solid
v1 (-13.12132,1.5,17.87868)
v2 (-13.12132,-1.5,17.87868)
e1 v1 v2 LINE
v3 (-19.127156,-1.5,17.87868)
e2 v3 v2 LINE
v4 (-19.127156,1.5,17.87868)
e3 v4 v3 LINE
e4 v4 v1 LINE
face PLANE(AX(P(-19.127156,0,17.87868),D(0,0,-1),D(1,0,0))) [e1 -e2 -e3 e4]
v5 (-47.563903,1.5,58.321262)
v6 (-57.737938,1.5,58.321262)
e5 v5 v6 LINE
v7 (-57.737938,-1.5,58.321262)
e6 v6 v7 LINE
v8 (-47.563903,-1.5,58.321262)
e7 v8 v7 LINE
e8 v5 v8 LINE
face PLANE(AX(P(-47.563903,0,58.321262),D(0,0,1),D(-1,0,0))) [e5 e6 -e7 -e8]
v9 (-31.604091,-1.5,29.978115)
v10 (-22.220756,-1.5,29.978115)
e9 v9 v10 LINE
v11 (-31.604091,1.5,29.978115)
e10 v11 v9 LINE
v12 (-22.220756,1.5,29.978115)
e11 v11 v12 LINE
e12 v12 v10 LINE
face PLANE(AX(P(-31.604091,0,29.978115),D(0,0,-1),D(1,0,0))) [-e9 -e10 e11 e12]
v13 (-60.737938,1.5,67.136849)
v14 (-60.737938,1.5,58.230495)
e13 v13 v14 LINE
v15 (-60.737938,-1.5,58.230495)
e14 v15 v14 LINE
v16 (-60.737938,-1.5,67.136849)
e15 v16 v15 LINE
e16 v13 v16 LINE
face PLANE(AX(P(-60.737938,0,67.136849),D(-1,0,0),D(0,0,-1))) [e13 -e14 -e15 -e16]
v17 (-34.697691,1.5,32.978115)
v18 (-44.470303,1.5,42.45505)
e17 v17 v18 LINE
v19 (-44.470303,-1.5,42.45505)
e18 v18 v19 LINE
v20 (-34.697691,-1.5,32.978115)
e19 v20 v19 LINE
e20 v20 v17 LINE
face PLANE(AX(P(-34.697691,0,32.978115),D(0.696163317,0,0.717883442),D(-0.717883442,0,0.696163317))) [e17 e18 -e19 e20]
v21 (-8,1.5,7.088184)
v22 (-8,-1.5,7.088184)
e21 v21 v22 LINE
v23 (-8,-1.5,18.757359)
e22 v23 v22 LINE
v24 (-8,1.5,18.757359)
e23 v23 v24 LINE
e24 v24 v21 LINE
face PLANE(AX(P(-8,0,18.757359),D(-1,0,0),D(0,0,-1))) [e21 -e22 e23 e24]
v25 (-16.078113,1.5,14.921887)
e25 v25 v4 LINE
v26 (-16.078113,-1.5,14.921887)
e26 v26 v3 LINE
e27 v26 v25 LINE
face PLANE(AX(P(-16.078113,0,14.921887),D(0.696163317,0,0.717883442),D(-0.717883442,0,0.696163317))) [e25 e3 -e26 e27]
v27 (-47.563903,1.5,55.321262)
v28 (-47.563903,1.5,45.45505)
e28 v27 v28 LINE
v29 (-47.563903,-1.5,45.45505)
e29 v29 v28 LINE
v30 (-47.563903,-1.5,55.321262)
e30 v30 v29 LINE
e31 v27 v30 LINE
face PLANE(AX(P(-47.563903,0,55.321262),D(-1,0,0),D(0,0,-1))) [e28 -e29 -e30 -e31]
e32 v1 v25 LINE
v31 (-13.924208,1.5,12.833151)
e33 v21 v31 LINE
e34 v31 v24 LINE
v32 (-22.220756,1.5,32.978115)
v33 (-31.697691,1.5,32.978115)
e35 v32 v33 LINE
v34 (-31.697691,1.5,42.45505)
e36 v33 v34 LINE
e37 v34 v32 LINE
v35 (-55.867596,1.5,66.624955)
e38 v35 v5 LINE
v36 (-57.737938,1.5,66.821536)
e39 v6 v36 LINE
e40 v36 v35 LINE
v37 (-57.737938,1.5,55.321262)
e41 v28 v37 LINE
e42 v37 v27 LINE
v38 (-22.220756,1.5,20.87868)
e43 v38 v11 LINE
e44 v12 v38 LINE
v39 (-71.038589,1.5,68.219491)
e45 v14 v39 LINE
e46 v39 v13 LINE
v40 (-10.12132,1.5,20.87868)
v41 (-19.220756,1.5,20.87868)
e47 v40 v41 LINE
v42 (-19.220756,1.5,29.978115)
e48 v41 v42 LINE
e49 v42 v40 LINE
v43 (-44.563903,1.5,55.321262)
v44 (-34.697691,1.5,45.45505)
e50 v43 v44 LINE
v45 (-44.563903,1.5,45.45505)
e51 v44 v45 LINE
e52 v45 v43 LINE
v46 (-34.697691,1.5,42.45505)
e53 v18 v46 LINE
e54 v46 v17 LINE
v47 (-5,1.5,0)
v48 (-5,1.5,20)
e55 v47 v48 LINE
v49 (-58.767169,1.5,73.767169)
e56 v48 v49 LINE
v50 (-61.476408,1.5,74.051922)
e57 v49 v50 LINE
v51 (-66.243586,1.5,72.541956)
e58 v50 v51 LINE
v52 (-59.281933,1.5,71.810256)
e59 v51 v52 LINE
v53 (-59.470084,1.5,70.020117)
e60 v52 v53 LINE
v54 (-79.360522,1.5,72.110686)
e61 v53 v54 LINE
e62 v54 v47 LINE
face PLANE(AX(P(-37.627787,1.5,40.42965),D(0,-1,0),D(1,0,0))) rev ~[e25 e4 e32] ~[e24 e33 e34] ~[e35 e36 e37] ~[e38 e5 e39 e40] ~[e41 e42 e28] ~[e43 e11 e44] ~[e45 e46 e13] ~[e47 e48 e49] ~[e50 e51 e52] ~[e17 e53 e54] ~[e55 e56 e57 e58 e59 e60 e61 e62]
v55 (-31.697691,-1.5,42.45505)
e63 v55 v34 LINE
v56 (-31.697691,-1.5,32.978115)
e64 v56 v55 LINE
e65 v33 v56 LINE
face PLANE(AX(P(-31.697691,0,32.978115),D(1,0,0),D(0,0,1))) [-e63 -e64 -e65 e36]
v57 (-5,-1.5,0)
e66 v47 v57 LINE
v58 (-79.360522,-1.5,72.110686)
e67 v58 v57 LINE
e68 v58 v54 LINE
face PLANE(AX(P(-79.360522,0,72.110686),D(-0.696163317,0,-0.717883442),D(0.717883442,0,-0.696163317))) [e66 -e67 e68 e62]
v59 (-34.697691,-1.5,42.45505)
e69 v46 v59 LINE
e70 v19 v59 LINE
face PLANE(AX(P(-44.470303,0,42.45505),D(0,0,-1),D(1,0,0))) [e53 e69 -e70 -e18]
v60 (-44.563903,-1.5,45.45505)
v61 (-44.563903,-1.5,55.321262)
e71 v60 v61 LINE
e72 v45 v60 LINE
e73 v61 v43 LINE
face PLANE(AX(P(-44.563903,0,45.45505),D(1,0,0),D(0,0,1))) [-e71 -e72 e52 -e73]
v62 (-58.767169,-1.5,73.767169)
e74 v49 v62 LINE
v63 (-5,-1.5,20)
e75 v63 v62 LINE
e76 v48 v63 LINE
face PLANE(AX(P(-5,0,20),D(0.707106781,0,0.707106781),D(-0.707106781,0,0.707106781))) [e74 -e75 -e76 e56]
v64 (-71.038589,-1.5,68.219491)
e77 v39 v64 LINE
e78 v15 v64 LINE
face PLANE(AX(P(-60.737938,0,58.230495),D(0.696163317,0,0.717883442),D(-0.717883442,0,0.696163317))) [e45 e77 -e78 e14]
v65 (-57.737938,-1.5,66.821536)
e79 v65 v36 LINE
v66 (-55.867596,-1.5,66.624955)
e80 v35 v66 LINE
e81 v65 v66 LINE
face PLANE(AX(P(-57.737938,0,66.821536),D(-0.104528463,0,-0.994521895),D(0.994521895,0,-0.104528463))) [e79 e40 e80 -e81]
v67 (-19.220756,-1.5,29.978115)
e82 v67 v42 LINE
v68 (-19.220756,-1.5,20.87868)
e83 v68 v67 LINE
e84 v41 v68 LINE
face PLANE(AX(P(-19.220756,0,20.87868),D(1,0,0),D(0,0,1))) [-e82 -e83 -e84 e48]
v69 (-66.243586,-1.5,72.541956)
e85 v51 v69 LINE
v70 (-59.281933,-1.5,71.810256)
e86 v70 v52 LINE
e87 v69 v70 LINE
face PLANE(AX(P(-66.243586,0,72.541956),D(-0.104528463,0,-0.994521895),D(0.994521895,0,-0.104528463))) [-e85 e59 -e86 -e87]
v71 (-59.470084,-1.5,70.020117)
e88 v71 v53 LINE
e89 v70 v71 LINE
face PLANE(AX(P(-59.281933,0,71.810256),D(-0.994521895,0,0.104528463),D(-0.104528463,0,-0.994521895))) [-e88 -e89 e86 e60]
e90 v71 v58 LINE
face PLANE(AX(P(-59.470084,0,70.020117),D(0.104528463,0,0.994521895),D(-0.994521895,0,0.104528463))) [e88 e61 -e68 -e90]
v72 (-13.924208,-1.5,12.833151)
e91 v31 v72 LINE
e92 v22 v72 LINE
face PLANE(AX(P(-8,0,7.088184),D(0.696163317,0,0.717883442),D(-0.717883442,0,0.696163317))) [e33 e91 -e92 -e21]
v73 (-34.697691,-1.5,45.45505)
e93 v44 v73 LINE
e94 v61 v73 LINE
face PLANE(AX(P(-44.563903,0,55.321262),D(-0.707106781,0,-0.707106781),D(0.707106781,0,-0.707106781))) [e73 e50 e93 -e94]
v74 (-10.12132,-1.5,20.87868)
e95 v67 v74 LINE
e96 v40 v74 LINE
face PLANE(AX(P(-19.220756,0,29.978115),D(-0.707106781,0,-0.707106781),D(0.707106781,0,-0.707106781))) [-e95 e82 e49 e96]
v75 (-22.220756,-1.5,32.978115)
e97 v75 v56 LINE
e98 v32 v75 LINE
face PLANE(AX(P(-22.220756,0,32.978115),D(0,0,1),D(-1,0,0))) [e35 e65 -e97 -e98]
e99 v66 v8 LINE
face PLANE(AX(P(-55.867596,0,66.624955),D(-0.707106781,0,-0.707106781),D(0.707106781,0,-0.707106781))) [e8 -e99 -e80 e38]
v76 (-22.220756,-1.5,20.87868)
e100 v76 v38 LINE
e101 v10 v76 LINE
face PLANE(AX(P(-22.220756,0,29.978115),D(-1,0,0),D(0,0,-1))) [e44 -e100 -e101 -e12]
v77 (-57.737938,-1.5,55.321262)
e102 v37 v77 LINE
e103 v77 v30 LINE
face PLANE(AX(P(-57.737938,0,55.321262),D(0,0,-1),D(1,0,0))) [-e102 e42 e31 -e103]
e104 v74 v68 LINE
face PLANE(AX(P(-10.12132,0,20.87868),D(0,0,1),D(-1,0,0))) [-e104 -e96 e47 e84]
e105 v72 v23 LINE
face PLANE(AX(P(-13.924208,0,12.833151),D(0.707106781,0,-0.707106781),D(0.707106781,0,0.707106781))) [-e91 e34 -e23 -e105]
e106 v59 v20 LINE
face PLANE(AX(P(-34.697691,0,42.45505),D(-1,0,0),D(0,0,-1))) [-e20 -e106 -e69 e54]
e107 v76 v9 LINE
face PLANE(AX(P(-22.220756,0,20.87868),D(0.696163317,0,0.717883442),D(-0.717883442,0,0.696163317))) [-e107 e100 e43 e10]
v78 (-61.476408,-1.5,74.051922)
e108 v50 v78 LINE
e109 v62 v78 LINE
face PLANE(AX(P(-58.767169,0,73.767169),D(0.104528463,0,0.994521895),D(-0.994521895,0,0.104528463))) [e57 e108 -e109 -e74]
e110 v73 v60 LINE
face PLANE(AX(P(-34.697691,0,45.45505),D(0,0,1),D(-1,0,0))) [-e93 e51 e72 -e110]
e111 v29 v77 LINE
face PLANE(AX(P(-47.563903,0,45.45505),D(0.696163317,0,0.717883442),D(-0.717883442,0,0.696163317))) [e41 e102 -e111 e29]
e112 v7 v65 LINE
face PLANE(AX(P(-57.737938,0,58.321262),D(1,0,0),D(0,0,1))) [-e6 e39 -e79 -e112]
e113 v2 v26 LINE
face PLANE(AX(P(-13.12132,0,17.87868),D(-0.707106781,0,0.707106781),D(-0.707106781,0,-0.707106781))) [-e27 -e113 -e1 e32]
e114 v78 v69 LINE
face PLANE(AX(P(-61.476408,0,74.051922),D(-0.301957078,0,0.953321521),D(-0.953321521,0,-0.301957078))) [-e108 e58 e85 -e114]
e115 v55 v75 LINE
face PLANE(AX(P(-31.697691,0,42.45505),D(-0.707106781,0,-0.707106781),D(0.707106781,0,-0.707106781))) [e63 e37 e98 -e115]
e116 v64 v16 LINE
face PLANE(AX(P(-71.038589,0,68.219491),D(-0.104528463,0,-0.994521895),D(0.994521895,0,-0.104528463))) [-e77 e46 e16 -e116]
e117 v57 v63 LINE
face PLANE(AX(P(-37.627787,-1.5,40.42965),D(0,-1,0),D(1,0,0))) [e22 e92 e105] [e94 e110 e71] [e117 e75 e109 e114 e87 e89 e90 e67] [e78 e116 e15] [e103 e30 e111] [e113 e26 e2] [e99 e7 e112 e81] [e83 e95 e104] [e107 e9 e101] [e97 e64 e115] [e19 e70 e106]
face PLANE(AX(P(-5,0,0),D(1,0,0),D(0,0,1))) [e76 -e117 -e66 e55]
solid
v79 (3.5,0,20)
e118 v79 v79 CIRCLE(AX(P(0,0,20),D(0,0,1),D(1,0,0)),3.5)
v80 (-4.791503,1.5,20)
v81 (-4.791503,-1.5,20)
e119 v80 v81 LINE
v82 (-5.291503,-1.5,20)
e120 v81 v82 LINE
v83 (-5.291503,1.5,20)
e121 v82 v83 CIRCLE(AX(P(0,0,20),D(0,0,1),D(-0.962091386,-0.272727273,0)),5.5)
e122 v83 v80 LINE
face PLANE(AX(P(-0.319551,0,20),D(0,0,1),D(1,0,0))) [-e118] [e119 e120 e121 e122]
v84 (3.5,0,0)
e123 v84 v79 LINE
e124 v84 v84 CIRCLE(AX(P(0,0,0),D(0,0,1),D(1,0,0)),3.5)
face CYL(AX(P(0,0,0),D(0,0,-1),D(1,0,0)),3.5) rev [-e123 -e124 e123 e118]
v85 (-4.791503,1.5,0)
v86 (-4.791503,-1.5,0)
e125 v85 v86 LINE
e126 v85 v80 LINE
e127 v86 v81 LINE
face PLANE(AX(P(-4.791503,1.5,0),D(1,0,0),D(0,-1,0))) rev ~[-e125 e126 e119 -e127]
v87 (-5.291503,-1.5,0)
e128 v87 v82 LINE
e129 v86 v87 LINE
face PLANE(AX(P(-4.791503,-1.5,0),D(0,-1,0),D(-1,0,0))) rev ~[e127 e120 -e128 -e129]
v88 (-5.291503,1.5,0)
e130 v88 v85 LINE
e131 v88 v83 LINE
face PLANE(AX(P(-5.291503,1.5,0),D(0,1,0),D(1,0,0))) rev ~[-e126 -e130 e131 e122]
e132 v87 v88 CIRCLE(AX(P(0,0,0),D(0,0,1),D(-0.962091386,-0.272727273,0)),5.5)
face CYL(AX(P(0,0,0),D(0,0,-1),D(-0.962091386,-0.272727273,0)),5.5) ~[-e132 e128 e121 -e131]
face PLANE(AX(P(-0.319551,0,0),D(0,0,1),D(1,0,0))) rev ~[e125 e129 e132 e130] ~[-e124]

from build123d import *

# Parameters (mm, degrees)
F0_R     = 3.5
F1_DEPTH = 20
F3_DEPTH = 1.5


# Not quite as in the source:
# - a feature names something its author has since deleted; it is built from what else it names


with BuildPart() as f1:
    # F0 (on Top) → F1 (new body)
    with BuildSketch(Plane.XY):
        with BuildLine():
            Line((-4.7915026221, -1.5), (-5.2915026221, -1.5))
            ThreePointArc((-5.2915026221, -1.5), (5.5, 0), (-5.2915026221, 1.5))
            Line((-5.2915026221, 1.5), (-4.7915026221, 1.5))
            Line((-4.7915026221, 1.5), (-4.7915026221, -1.5))
        make_face()
        Circle(F0_R, mode=Mode.SUBTRACT)
    extrude(amount=F1_DEPTH)


with BuildPart() as f3:
    # F2 (on Front) → F3 (new body, symmetric)
    with BuildSketch(Plane.XZ):
        Polygon((-79.3605220673, 72.1106862647), (-5, 0), (-5, 20), (-54.4974746831, 69.4974746831), (-59.4700841599, 70.0201169994), align=None)
        Polygon((-57.7379381947, 66.8215362837), (-55.8675960947, 66.6249554076), (-47.5639026581, 58.321261971), (-44.5639026581, 55.321261971), (-34.6976905307, 45.4550498436), (-31.6976905307, 42.4550498436), (-22.2207557225, 32.9781150354), (-19.2207557225, 29.9781150354), (-10.1213203436, 20.8786796564), (-8, 18.7573593129), (-8, 7.0881840299), (-13.9242084231, 12.8331508898), (-16.0781127981, 14.9218872019), (-19.1271564551, 17.8786796564), (-22.2207557225, 20.8786796564), (-31.6040912633, 29.9781150354), (-34.6976905307, 32.9781150354), (-44.4703033907, 42.4550498436), (-47.5639026581, 45.4550498436), (-57.7379381947, 55.321261971), (-60.7379381947, 58.2304946227), (-71.0385888152, 68.2194909957), (-60.7379381947, 67.1368489895), align=None, mode=Mode.SUBTRACT)
        Polygon((-44.5639026581, 55.321261971), (-47.5639026581, 58.321261971), (-57.7379381947, 58.321261971), (-57.7379381947, 66.8215362837), (-60.7379381947, 67.1368489895), (-60.7379381947, 58.2304946227), (-57.7379381947, 55.321261971), (-47.5639026581, 55.321261971), (-47.5639026581, 45.4550498436), (-44.4703033907, 42.4550498436), (-34.6976905307, 42.4550498436), (-34.6976905307, 32.9781150354), (-31.6040912633, 29.9781150354), (-22.2207557225, 29.9781150354), (-22.2207557225, 20.8786796564), (-19.1271564551, 17.8786796564), (-13.1213203436, 17.8786796564), (-16.0781127981, 14.9218872019), (-13.9242084231, 12.8331508898), (-8, 18.7573593129), (-10.1213203436, 20.8786796564), (-19.2207557225, 20.8786796564), (-19.2207557225, 29.9781150354), (-22.2207557225, 32.9781150354), (-31.6976905307, 32.9781150354), (-31.6976905307, 42.4550498436), (-34.6976905307, 45.4550498436), (-44.5639026581, 45.4550498436), align=None)
        Polygon((-59.281932926, 71.8102564111), (-59.4700841599, 70.0201169994), (-54.4974746831, 69.4974746831), (-58.7671691133, 73.7671691133), (-61.4764084229, 74.0519216391), (-66.2435861936, 72.5419556539), align=None)
    extrude(amount=F3_DEPTH, both=True)


solid = Compound([f1.part, f3.part])
